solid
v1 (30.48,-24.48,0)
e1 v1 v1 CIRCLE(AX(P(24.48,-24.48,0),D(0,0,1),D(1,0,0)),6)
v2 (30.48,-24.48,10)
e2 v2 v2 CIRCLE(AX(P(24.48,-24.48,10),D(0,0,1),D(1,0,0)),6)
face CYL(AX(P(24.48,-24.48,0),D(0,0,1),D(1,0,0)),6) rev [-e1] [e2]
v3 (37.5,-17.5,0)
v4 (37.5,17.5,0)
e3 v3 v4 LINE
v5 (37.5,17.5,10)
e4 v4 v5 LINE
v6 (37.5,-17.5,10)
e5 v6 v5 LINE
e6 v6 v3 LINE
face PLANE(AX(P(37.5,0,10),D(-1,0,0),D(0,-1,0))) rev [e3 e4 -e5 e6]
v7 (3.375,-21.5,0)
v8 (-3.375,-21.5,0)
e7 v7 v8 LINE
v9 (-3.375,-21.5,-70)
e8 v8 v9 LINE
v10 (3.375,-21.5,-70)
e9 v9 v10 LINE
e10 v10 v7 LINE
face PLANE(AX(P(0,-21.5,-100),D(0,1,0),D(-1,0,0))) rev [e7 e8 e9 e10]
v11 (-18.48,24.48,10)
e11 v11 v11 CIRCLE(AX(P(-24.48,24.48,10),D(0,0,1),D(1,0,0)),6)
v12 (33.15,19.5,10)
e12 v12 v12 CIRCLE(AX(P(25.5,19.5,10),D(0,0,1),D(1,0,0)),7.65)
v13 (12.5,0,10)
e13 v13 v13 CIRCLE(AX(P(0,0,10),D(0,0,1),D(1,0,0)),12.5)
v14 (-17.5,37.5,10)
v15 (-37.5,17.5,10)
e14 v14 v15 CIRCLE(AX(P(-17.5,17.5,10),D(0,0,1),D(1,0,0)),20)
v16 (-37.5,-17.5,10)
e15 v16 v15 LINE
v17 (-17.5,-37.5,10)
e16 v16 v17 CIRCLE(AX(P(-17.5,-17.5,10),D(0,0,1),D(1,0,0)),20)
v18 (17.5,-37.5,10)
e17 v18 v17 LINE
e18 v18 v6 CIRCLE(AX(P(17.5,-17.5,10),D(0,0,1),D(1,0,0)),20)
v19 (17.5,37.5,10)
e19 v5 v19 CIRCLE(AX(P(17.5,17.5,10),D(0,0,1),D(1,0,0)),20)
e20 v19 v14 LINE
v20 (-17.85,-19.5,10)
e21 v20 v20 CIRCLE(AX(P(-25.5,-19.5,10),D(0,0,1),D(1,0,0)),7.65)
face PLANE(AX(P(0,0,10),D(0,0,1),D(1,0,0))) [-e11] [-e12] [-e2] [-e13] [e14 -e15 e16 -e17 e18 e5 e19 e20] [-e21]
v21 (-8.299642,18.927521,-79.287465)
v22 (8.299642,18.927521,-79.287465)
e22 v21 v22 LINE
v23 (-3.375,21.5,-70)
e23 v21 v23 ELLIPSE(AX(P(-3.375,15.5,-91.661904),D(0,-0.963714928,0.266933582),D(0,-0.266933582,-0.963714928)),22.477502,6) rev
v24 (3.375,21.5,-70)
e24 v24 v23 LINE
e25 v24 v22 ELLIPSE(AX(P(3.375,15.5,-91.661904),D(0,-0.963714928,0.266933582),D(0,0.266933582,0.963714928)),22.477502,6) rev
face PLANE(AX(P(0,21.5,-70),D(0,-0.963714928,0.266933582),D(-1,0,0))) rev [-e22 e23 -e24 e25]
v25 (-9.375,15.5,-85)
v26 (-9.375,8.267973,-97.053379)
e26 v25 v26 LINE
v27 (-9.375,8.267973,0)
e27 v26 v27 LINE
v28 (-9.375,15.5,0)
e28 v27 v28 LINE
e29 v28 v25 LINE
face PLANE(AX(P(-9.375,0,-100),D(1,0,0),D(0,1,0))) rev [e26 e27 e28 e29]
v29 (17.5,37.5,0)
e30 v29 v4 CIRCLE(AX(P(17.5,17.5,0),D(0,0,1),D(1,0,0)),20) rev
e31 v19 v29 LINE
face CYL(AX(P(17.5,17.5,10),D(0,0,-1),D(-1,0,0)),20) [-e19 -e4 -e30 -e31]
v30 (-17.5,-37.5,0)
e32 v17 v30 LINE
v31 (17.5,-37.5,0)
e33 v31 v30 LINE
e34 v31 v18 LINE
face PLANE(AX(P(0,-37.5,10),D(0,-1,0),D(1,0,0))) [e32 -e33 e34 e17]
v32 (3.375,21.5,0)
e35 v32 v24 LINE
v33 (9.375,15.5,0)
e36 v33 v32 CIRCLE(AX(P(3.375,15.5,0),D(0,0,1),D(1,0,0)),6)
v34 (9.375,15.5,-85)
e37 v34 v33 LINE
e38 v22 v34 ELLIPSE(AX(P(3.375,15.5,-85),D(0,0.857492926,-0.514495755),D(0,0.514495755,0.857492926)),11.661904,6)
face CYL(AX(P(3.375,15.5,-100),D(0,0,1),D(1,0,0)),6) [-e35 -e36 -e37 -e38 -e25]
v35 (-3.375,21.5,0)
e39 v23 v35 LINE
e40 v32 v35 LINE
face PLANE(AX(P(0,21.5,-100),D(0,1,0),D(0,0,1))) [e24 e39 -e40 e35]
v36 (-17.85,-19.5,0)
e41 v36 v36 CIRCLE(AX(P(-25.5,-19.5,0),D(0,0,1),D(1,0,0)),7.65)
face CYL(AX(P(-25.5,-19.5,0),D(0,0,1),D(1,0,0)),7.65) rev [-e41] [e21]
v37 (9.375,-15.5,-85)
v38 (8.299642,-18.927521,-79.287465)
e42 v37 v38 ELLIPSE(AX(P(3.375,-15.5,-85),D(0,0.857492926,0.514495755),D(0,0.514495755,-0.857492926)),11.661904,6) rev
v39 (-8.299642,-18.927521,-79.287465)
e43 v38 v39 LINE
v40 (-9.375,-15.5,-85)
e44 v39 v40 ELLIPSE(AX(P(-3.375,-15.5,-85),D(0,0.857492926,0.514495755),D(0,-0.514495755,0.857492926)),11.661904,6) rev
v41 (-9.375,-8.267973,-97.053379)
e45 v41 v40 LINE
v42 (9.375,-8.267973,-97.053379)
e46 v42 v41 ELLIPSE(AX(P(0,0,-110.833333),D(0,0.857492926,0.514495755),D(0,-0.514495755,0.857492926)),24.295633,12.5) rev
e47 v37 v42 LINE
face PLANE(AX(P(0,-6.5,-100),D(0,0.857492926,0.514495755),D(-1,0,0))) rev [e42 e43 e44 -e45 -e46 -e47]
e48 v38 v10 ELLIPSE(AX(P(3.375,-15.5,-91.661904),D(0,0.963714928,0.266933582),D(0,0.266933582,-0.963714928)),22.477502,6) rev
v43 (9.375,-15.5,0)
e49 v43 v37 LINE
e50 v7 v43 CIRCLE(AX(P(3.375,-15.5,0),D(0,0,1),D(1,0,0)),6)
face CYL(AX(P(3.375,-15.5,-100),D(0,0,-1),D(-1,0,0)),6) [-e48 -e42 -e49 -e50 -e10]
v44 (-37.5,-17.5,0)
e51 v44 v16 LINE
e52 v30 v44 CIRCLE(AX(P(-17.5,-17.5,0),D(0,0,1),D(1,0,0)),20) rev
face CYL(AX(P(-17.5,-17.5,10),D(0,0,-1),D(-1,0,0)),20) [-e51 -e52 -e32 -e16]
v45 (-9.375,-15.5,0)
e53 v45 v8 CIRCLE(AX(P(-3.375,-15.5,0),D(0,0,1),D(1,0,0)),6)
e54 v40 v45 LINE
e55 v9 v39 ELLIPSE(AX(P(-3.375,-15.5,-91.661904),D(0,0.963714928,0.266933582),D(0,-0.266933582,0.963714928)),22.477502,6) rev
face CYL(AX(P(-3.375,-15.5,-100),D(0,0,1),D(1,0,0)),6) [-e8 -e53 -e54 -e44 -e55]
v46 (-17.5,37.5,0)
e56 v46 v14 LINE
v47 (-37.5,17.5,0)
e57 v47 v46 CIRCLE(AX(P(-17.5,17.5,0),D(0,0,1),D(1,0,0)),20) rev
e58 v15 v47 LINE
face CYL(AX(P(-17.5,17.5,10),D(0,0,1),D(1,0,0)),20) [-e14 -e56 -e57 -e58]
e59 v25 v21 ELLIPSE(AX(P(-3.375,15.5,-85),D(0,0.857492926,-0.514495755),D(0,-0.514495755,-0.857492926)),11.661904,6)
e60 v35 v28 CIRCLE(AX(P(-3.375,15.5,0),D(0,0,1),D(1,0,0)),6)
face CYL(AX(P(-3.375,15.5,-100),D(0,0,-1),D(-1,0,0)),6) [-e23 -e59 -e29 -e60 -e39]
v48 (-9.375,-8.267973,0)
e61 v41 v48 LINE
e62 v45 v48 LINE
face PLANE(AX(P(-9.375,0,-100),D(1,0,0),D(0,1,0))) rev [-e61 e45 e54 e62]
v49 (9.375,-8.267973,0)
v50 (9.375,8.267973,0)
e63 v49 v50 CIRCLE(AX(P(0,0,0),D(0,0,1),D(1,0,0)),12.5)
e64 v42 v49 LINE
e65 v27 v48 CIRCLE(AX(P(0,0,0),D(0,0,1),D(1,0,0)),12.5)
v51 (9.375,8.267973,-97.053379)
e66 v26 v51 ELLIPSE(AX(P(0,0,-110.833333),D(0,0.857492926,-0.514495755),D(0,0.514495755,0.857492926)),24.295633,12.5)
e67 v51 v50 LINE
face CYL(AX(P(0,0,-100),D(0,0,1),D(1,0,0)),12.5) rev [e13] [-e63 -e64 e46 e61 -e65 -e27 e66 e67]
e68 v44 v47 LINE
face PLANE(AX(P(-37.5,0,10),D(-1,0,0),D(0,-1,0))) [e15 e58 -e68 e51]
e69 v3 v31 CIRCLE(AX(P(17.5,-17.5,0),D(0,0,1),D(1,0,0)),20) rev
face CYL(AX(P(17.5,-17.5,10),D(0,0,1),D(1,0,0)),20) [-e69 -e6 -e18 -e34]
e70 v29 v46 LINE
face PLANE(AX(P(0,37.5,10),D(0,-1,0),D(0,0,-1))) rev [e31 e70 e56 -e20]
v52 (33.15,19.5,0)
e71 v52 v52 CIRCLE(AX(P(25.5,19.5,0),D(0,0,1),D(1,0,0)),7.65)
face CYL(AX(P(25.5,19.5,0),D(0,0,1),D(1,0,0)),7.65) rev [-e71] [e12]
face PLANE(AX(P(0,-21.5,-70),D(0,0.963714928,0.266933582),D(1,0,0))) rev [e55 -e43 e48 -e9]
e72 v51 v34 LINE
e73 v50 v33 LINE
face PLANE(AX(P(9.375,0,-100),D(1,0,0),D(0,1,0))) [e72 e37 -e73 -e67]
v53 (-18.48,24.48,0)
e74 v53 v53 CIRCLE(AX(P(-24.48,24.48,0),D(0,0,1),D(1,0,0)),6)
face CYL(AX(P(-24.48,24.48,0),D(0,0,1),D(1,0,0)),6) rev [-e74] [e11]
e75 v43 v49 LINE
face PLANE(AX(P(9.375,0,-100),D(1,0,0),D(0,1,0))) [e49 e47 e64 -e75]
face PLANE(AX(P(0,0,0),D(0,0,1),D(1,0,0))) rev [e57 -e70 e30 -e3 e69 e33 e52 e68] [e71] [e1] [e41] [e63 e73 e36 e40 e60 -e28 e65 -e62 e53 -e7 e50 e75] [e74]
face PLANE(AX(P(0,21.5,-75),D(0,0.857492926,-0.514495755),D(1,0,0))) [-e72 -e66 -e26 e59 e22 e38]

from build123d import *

# Parameters (mm, degrees)
CROQUIS2_W              = 75
CROQUIS2_H              = 75
SALIENTE_EXTRUIR1_DEPTH = 10
SALIENTE_EXTRUIR2_DEPTH = 100
CHAFL_N1_SIZE           = 25
CHAFL_N1_SIZE_2         = 15
CHAFL_N2_SIZE           = 25
CHAFL_N2_SIZE_2         = 15
CORTAR_EXTRUIR1_REACH   = 112.598
CHAFL_N3_SIZE           = 5
REDONDEO1_R             = 6
REDONDEO2_R             = 20
SKETCH1_R               = 7.65
SKETCH1_R_2             = 6
CUT_EXTRUDE2_DEPTH      = 10


with BuildPart() as part:
    # Croquis2 → Saliente-Extruir1 (new body)
    with BuildSketch(Plane(origin=(0, 0, 0), x_dir=(0, 1, 0), z_dir=(0, 0, 1))):
        Rectangle(CROQUIS2_W, CROQUIS2_H)
    extrude(amount=SALIENTE_EXTRUIR1_DEPTH)

    # Croquis2<3> → Saliente-Extruir2 (add)
    with BuildSketch(Plane(origin=(0, 0, 0), x_dir=(0, 1, 0), z_dir=(0, 0, 1))):
        with BuildLine():
            Line((-21.5, 9.375), (-21.5, -9.375))
            Line((-21.5, -9.375), (-8.267972847, -9.375))
            ThreePointArc((-8.267972847, -9.375), (-12.5, 0), (-8.267972847, 9.375))
            Line((-8.267972847, 9.375), (-21.5, 9.375))
        make_face()
        with BuildLine():
            ThreePointArc((8.267972847, 9.375), (12.5, 0), (8.267972847, -9.375))
            Line((8.267972847, -9.375), (21.5, -9.375))
            Line((21.5, -9.375), (21.5, 9.375))
            Line((21.5, 9.375), (8.267972847, 9.375))
        make_face()
    extrude(amount=-SALIENTE_EXTRUIR2_DEPTH)

    # Chaflán1
    # the kernel refuses this chamfer: 25, 15 mm, written as the material it takes off along each edge
    with BuildSketch(Plane(origin=(74.03152743, 21.5, -100), x_dir=(0, 0.01989341895858247, 0.9998021063601227), z_dir=(-1, 0, 0))) as chafl_n1_piece_1:
        Polygon((CHAFL_N1_SIZE * 0.99980210636, -CHAFL_N1_SIZE * 0.0198934189586), (-CHAFL_N1_SIZE_2 * 0.0198934189586, -CHAFL_N1_SIZE_2 * 0.99980210636), (0, 0), align=None)
    extrude(amount=148.06305486, mode=Mode.SUBTRACT)

    # Chaflán2
    # the kernel refuses this chamfer: 25, 15 mm, written as the material it takes off along each edge
    with BuildSketch(Plane(origin=(-74.03152743, -21.5, -100), x_dir=(0, -0.01989341895858247, 0.9998021063601227), z_dir=(1, 0, 0))) as chafl_n2_piece_1:
        Polygon((CHAFL_N2_SIZE * 0.99980210636, -CHAFL_N2_SIZE * 0.0198934189586), (-CHAFL_N2_SIZE_2 * 0.0198934189586, -CHAFL_N2_SIZE_2 * 0.99980210636), (0, 0), align=None)
    extrude(amount=148.06305486, mode=Mode.SUBTRACT)

    # Croquis2<4> → Cortar-Extruir1 (cut, up to next)
    with BuildSketch(Plane(origin=(0, 0, 0), x_dir=(0, 1, 0), z_dir=(0, 0, 1)), mode=Mode.PRIVATE) as cortar_extruir1_sk1:
        with BuildLine():
            ThreePointArc((-8.267972847, 9.375), (-12.5, 0), (-8.267972847, -9.375))
            Line((-8.267972847, -9.375), (8.267972847, -9.375))
            ThreePointArc((8.267972847, -9.375), (11.392972847, -5.142972847), (12.5, 0))
            ThreePointArc((12.5, 0), (11.392972847, 5.142972847), (8.267972847, 9.375))
            Line((8.267972847, 9.375), (-8.267972847, 9.375))
        make_face()
    cortar_extruir1_tool1 = extrude(cortar_extruir1_sk1.sketch, amount=CORTAR_EXTRUIR1_REACH, mode=Mode.PRIVATE) & part.part
    # Croquis2<4> → Cortar-Extruir1 (cut, up to next)
    with BuildSketch(Plane(origin=(0, 0, 0), x_dir=(0, 1, 0), z_dir=(0, 0, 1)), mode=Mode.PRIVATE) as cortar_extruir1_sk2:
        with BuildLine():
            Line((8.267972847, -9.375), (-8.267972847, -9.375))
            ThreePointArc((-8.267972847, -9.375), (0, -12.5), (8.267972847, -9.375))
        make_face()
    cortar_extruir1_tool2 = extrude(cortar_extruir1_sk2.sketch, amount=CORTAR_EXTRUIR1_REACH, mode=Mode.PRIVATE) & part.part
    # Croquis2<4> → Cortar-Extruir1 (cut, up to next)
    with BuildSketch(Plane(origin=(0, 0, 0), x_dir=(0, 1, 0), z_dir=(0, 0, 1)), mode=Mode.PRIVATE) as cortar_extruir1_sk3:
        with BuildLine():
            ThreePointArc((8.267972847, 9.375), (0, 12.5), (-8.267972847, 9.375))
            Line((-8.267972847, 9.375), (8.267972847, 9.375))
        make_face()
    cortar_extruir1_tool3 = extrude(cortar_extruir1_sk3.sketch, amount=CORTAR_EXTRUIR1_REACH, mode=Mode.PRIVATE) & part.part
    add(cortar_extruir1_tool1.solids().sort_by_distance((0, 0, 0))[0], mode=Mode.SUBTRACT)
    add(cortar_extruir1_tool2.solids().sort_by_distance((10.639442, 0, 0))[0], mode=Mode.SUBTRACT)
    add(cortar_extruir1_tool3.solids().sort_by_distance((-10.639442, 0, 0))[0], mode=Mode.SUBTRACT)

    # Chaflán3
    chafl_n3_edges = [part.edges().sort_by_distance(p)[0] for p in [
        (0, 21.5, -75),
        (0, -21.5, -75),
    ]]
    chamfer(chafl_n3_edges, length=CHAFL_N3_SIZE)

    # Redondeo1
    redondeo1_edges = [part.edges().sort_by_distance(p)[0] for p in [
        (-9.375, -21.5, -35),
        (9.375, -21.5, -35),
        (9.375, 21.5, -35),
        (-9.375, 21.5, -35),
    ]]
    fillet(redondeo1_edges, radius=REDONDEO1_R)

    # Redondeo2
    redondeo2_edges = [part.edges().sort_by_distance(p)[0] for p in [
        (37.5, -37.5, 5),
        (-37.5, -37.5, 5),
        (-37.5, 37.5, 5),
        (37.5, 37.5, 5),
    ]]
    fillet(redondeo2_edges, radius=REDONDEO2_R)

    # Sketch1 → Cut-Extrude2 (cut)
    with BuildSketch(Plane.XY.offset(10)):
        with Locations((25.5, 19.5)):
            Circle(SKETCH1_R)
        with Locations((-24.48, 24.48)):
            Circle(SKETCH1_R_2)
        with Locations((-25.5, -19.5)):
            Circle(SKETCH1_R)
        with Locations((24.48, -24.48)):
            Circle(SKETCH1_R_2)
    extrude(amount=-CUT_EXTRUDE2_DEPTH, mode=Mode.SUBTRACT)


solid = part.part
